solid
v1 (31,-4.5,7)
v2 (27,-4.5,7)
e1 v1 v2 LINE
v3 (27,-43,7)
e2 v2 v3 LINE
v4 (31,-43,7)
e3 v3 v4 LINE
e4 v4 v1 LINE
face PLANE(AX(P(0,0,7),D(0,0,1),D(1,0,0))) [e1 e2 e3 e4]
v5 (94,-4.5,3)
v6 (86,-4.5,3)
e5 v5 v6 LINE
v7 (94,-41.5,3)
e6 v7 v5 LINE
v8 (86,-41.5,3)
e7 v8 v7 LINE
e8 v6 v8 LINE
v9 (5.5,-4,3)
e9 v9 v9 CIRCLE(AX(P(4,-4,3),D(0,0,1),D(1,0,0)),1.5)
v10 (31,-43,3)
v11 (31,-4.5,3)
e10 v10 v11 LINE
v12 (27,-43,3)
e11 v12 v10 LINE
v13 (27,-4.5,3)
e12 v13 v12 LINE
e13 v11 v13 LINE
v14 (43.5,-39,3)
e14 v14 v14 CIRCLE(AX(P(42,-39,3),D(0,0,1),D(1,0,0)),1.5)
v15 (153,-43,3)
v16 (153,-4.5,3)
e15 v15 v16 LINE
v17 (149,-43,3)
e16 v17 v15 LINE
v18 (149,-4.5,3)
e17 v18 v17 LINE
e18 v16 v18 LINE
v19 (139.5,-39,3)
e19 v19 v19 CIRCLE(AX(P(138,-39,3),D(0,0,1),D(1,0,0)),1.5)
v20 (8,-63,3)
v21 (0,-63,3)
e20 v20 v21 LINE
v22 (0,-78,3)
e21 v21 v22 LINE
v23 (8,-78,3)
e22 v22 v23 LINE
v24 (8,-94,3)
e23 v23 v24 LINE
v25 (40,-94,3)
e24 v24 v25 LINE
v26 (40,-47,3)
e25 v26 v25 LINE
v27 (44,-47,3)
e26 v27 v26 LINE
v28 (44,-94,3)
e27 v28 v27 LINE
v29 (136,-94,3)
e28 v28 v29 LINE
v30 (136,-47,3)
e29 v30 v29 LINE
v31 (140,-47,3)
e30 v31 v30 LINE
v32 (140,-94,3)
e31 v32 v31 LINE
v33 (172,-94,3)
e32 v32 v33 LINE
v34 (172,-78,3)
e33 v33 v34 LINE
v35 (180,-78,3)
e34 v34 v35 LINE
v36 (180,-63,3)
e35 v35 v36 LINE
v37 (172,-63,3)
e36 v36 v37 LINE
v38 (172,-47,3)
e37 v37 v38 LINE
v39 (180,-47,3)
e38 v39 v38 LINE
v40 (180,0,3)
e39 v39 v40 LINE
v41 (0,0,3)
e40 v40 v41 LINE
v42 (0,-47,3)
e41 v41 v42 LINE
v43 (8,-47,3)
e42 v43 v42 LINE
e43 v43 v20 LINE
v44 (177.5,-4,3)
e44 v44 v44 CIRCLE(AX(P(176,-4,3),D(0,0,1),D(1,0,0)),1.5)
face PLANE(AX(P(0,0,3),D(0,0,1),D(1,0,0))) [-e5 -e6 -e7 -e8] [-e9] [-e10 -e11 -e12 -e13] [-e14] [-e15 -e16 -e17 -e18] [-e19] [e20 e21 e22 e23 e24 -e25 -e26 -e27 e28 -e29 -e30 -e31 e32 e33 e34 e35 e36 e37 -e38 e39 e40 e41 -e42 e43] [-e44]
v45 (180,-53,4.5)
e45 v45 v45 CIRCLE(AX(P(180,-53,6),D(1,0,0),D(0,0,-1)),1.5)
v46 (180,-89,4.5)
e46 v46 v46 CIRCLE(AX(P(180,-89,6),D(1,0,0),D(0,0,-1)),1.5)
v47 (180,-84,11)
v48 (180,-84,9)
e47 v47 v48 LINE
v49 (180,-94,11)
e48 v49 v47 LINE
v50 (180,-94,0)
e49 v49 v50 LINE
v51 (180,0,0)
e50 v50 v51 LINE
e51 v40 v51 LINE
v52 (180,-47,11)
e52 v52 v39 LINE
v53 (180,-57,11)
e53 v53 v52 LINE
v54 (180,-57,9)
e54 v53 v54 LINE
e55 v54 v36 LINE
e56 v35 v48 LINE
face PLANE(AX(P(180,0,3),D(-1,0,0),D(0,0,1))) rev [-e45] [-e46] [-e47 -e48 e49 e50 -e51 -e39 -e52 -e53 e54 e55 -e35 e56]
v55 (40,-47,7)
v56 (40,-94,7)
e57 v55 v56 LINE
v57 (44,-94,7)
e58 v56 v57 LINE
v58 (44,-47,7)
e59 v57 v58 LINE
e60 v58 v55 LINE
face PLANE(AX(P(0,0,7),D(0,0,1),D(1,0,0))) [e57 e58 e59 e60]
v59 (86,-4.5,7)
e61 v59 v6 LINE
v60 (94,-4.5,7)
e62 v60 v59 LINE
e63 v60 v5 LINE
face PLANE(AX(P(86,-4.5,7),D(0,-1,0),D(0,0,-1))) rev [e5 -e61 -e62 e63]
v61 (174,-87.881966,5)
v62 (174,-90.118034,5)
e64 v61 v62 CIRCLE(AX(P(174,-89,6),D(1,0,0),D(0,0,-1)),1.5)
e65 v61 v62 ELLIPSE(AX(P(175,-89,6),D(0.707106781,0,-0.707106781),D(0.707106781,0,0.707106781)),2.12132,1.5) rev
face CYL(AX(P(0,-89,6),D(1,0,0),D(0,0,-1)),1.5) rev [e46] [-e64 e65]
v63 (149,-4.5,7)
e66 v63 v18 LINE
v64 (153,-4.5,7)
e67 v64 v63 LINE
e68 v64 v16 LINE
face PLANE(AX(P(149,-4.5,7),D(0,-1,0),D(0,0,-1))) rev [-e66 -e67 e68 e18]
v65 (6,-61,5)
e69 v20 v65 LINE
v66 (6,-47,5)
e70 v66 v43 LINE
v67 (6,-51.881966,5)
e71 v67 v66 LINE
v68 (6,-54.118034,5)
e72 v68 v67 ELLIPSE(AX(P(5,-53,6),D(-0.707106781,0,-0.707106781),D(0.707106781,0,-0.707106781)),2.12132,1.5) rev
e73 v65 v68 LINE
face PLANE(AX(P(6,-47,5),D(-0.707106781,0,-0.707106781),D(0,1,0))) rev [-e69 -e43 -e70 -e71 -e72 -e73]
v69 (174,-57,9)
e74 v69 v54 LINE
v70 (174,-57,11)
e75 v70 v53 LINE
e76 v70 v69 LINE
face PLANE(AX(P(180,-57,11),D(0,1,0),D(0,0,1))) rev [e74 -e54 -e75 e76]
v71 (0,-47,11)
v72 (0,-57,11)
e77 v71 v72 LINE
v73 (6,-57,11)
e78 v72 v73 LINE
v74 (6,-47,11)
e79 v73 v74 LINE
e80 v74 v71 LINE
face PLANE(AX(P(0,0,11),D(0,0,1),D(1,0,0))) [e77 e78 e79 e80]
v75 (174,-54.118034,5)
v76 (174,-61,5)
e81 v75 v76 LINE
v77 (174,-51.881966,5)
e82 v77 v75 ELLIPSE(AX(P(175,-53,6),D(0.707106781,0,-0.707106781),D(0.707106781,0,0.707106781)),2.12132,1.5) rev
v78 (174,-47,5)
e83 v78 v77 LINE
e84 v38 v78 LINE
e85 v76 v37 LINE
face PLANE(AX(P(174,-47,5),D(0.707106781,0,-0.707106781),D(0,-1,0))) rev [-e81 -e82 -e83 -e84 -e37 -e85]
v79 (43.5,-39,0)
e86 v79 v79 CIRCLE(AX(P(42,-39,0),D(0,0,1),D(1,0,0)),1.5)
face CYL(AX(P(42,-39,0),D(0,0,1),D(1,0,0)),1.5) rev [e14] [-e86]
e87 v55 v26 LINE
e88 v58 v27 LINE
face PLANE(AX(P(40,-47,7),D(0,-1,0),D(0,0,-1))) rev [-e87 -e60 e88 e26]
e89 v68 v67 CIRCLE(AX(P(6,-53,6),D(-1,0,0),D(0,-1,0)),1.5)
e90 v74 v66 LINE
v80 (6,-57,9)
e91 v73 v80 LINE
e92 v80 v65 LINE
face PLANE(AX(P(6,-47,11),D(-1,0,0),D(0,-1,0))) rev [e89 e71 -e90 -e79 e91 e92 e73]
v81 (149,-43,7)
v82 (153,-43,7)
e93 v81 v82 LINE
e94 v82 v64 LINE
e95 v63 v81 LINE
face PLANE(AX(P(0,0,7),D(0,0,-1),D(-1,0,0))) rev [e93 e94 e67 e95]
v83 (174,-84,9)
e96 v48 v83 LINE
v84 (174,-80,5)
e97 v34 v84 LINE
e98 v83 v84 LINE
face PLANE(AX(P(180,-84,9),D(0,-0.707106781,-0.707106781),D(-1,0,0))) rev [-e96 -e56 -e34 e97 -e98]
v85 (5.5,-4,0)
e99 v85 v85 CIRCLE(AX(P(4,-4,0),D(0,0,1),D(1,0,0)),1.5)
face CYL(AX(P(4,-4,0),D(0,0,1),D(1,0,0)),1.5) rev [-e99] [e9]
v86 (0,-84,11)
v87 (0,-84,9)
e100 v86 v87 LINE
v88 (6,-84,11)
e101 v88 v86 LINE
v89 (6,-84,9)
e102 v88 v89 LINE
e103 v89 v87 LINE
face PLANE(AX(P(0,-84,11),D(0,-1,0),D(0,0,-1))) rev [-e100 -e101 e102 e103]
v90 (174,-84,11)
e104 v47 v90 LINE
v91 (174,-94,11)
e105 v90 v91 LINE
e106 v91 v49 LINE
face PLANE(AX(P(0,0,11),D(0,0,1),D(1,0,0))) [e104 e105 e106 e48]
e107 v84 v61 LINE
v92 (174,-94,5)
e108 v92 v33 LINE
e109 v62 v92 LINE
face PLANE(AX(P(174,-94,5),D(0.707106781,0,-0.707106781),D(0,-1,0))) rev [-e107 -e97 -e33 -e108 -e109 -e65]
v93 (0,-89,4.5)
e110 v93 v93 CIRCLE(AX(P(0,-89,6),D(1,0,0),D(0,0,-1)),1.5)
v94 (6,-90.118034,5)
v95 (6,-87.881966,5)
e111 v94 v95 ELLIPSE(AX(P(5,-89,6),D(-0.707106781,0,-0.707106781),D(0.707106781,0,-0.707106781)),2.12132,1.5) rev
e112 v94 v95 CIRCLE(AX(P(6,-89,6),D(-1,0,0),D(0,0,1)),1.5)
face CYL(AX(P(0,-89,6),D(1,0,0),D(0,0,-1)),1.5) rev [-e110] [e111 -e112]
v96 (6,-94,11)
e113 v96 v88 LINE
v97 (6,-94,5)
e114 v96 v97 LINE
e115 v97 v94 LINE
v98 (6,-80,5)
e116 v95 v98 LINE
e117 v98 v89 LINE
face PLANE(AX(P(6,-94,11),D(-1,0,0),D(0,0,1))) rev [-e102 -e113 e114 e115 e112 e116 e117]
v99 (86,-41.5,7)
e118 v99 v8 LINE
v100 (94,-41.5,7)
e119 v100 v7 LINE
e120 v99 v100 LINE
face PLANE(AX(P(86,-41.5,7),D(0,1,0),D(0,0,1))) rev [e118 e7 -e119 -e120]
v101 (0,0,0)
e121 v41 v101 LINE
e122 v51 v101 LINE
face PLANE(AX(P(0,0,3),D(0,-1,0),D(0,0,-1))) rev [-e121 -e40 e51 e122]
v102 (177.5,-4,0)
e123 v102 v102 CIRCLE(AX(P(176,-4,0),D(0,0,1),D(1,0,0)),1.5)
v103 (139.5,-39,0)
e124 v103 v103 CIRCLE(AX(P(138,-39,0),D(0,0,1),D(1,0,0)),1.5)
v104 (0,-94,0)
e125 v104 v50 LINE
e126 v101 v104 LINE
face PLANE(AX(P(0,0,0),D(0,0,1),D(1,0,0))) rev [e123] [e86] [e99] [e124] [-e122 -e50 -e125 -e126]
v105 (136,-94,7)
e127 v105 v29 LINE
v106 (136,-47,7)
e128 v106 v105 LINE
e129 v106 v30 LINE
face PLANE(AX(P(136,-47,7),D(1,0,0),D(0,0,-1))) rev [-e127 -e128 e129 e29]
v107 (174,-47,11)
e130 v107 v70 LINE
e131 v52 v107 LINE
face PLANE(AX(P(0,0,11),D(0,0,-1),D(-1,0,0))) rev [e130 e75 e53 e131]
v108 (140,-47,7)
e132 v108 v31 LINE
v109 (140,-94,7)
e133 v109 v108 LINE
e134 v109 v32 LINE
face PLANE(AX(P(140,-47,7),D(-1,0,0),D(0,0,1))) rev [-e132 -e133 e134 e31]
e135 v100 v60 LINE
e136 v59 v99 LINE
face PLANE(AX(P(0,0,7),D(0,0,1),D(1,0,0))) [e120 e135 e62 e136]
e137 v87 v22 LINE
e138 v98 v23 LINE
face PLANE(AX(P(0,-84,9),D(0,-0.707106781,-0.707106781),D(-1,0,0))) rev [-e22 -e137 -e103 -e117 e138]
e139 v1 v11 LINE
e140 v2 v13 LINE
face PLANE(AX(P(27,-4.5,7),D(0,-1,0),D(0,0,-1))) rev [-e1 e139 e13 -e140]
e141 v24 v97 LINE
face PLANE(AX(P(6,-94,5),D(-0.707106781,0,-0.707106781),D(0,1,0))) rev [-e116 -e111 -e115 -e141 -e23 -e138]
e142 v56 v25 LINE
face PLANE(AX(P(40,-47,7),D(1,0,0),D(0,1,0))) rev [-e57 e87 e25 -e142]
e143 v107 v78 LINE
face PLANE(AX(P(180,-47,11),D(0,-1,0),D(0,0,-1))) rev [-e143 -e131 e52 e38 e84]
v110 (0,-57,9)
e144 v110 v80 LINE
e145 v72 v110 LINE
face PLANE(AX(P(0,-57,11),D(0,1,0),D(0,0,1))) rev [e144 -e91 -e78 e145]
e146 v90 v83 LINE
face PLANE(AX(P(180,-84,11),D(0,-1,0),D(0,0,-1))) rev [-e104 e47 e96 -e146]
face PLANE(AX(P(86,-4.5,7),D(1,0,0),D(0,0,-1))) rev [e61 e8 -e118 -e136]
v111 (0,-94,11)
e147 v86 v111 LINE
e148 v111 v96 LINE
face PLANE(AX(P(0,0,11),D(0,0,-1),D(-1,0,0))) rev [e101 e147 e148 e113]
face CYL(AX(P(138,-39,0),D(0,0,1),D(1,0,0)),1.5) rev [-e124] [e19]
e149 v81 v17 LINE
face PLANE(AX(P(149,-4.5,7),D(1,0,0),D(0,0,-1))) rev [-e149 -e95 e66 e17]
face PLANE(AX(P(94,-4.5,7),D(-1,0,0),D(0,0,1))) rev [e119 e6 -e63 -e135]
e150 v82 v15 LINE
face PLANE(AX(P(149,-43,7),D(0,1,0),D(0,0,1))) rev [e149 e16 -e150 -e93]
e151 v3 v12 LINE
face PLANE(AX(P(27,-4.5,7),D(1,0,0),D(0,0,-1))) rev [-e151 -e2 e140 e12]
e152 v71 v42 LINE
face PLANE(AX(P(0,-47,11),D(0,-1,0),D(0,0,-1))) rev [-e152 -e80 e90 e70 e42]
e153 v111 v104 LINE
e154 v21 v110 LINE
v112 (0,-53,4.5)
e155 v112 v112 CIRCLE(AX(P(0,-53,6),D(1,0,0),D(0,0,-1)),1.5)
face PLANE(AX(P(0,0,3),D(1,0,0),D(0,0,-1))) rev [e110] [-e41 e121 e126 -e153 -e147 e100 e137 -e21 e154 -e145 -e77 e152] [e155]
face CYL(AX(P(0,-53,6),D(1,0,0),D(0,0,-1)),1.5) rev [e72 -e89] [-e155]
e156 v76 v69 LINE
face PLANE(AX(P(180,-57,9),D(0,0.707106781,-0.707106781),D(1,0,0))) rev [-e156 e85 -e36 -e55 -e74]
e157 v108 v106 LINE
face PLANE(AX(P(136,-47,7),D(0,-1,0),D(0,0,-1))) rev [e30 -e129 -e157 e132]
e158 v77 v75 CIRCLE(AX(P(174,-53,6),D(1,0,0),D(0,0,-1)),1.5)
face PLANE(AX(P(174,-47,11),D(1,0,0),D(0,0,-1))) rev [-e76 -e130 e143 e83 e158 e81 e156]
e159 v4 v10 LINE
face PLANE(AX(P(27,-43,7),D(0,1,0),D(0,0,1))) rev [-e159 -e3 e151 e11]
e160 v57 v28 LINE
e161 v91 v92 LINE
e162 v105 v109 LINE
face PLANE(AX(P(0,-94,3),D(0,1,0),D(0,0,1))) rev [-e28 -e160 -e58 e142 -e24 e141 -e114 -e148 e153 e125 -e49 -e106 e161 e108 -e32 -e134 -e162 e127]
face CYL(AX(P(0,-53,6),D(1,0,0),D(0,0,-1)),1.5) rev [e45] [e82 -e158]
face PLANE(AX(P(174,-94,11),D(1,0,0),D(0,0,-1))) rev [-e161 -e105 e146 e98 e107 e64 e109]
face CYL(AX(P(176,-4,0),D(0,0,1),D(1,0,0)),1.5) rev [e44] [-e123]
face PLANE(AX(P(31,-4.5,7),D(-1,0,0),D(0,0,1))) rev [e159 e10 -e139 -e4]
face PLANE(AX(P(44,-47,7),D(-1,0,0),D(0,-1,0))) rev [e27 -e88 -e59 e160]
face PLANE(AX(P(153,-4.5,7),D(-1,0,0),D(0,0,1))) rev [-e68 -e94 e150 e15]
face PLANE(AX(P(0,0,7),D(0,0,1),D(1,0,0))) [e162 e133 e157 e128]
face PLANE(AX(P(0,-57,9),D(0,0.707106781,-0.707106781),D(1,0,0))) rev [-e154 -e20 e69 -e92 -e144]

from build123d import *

# Parameters (mm, degrees)
SKETCH_1_W          = 180
SKETCH_1_H          = 94
EXTRUDE_1_DEPTH     = 3
SKETCH_2_W          = 6
SKETCH_2_H          = 10
EXTRUDE_2_DEPTH     = 8
CHAMFER_2_SIZE      = 6
CHAMFER_1_SIZE      = 6
SKETCH_3_R          = 1.5
CUT_EXTRUDE_1_DEPTH = 204.364205307
SKETCH_4_R          = 1.5
CUT_EXTRUDE_2_DEPTH = 204.224014329
SKETCH_5_W          = 4
SKETCH_5_H          = 47
SKETCH_5_H_2        = 38.5
SKETCH_5_W_2        = 8
SKETCH_5_H_3        = 37
EXTRUDE_3_DEPTH     = 4
CHAMFER_3_SIZE      = 2


with BuildPart() as part:
    # Эскиз1 → Бобышка-Вытянуть1 (new body)
    with BuildSketch(Plane.XY):
        with Locations((90, -47)):
            Rectangle(SKETCH_1_W, SKETCH_1_H)
    extrude(amount=EXTRUDE_1_DEPTH)

    # Эскиз2 → Бобышка-Вытянуть2 (add)
    with BuildSketch(Plane.XY.offset(3)):
        with Locations((3, -89)):
            Rectangle(SKETCH_2_W, SKETCH_2_H)
        with Locations((177, -89)):
            Rectangle(SKETCH_2_W, SKETCH_2_H)
        with Locations((3, -52)):
            Rectangle(SKETCH_2_W, SKETCH_2_H)
        with Locations((177, -52)):
            Rectangle(SKETCH_2_W, SKETCH_2_H)
    extrude(amount=EXTRUDE_2_DEPTH)

    # Фаска2
    chamfer_2_edges = [part.edges().sort_by_distance(p)[0] for p in [
        (3, -57, 3),
        (177, -57, 3),
    ]]
    chamfer(chamfer_2_edges, length=CHAMFER_2_SIZE)

    # Фаска1
    chamfer_1_edges = [part.edges().sort_by_distance(p)[0] for p in [
        (3, -84, 3),
        (177, -84, 3),
    ]]
    chamfer(chamfer_1_edges, length=CHAMFER_1_SIZE)

    # Эскиз3 → Вырез-Вытянуть1 (cut, through all)
    with BuildSketch(Plane(origin=(180, 0, 0), x_dir=(0, 0, -1), z_dir=(1, 0, 0))):
        with Locations((-6, -89)):
            Circle(SKETCH_3_R)
        with Locations((-6, -53)):
            Circle(SKETCH_3_R)
    extrude(amount=-CUT_EXTRUDE_1_DEPTH, mode=Mode.SUBTRACT)

    # Эскиз4 → Вырез-Вытянуть2 (cut, through all)
    with BuildSketch(Plane.XY.offset(3)):
        with Locations((4, -4)):
            Circle(SKETCH_4_R)
        with Locations((176, -4)):
            Circle(SKETCH_4_R)
        with Locations((42, -39)):
            Circle(SKETCH_4_R)
        with Locations((138, -39)):
            Circle(SKETCH_4_R)
    extrude(amount=-CUT_EXTRUDE_2_DEPTH, mode=Mode.SUBTRACT)

    # Эскиз5 → Бобышка-Вытянуть3 (add)
    with BuildSketch(Plane.XY.offset(3)):
        with Locations((42, -70.5)):
            Rectangle(SKETCH_5_W, SKETCH_5_H)
        with Locations((138, -70.5)):
            Rectangle(SKETCH_5_W, SKETCH_5_H)
        with Locations((29, -23.75)):
            Rectangle(SKETCH_5_W, SKETCH_5_H_2)
        with Locations((151, -23.75)):
            Rectangle(SKETCH_5_W, SKETCH_5_H_2)
        with Locations((90, -23)):
            Rectangle(SKETCH_5_W_2, SKETCH_5_H_3)
    extrude(amount=EXTRUDE_3_DEPTH)

    # Фаска3
    # the kernel refuses this chamfer: 2 mm, written as the material it adds along each edge
    with BuildSketch(Plane(origin=(6, -72.856634024, 3), x_dir=(0.9996219169112968, 0, -0.02749587661058627), z_dir=(0, -1, 0))) as chamfer_3_piece_1_section:
        Polygon((CHAMFER_3_SIZE * 0.999621916911, CHAMFER_3_SIZE * 0.0274958766106), (-CHAMFER_3_SIZE * 0.0274958766106, CHAMFER_3_SIZE * 0.999621916911), (0, 0), align=None)
    chamfer_3_piece_1 = extrude(amount=21.143365976, mode=Mode.PRIVATE)
    chamfer_3_piece_1 = split(chamfer_3_piece_1, bisect_by=Plane(origin=(6.672348165, -82.469530213, 7.469530213), z_dir=(0, -0.7071067811865476, -0.7071067811865476)), keep=Keep.TOP, mode=Mode.PRIVATE)
    chamfer_3_piece_1 = chamfer_3_piece_1 - Plane(origin=(6.672348165, -89, 6), x_dir=(0, 0, -1), z_dir=(1, 0, 0)) * Cylinder(1.5, 51, mode=Mode.PRIVATE)
    add(chamfer_3_piece_1)
    with BuildSketch(Plane(origin=(174, -94, 3), x_dir=(-0.9996219169112968, 0, -0.02749587661058639), z_dir=(0, 1, 0))) as chamfer_3_piece_2_section:
        Polygon((CHAMFER_3_SIZE * 0.999621916911, CHAMFER_3_SIZE * 0.0274958766106), (-CHAMFER_3_SIZE * 0.0274958766106, CHAMFER_3_SIZE * 0.999621916911), (0, 0), align=None)
    chamfer_3_piece_2 = extrude(amount=21.143365976, mode=Mode.PRIVATE)
    chamfer_3_piece_2 = split(chamfer_3_piece_2, bisect_by=Plane(origin=(173.327651835, -82.469530213, 7.469530213), z_dir=(0, -0.7071067811865476, -0.7071067811865476)), keep=Keep.TOP, mode=Mode.PRIVATE)
    chamfer_3_piece_2 = chamfer_3_piece_2 - Plane(origin=(173.327651835, -89, 6), x_dir=(0, 0, -1), z_dir=(1, 0, 0)) * Cylinder(1.5, 51, mode=Mode.PRIVATE)
    add(chamfer_3_piece_2)
    with BuildSketch(Plane(origin=(6, -47, 3), x_dir=(0.9996219169112968, 0, -0.02749587661058627), z_dir=(0, -1, 0))) as chamfer_3_piece_3_section:
        Polygon((CHAMFER_3_SIZE * 0.999621916911, CHAMFER_3_SIZE * 0.0274958766106), (-CHAMFER_3_SIZE * 0.0274958766106, CHAMFER_3_SIZE * 0.999621916911), (0, 0), align=None)
    chamfer_3_piece_3 = extrude(amount=21.143365976, mode=Mode.PRIVATE)
    chamfer_3_piece_3 = split(chamfer_3_piece_3, bisect_by=Plane(origin=(6.672348166, -58.527104034, 7.472895966), z_dir=(0, 0.7071067811865476, -0.7071067811865476)), keep=Keep.TOP, mode=Mode.PRIVATE)
    chamfer_3_piece_3 = chamfer_3_piece_3 - Plane(origin=(6.672348166, -53, 6), x_dir=(0, 0, -1), z_dir=(1, 0, 0)) * Cylinder(1.5, 51, mode=Mode.PRIVATE)
    add(chamfer_3_piece_3)
    with BuildSketch(Plane(origin=(174, -68.143365976, 3), x_dir=(-0.9996219169112968, 0, -0.02749587661058639), z_dir=(0, 1, 0))) as chamfer_3_piece_4_section:
        Polygon((CHAMFER_3_SIZE * 0.999621916911, CHAMFER_3_SIZE * 0.0274958766106), (-CHAMFER_3_SIZE * 0.0274958766106, CHAMFER_3_SIZE * 0.999621916911), (0, 0), align=None)
    chamfer_3_piece_4 = extrude(amount=21.143365976, mode=Mode.PRIVATE)
    chamfer_3_piece_4 = split(chamfer_3_piece_4, bisect_by=Plane(origin=(173.327651834, -58.527104034, 7.472895966), z_dir=(0, 0.7071067811865476, -0.7071067811865476)), keep=Keep.TOP, mode=Mode.PRIVATE)
    chamfer_3_piece_4 = chamfer_3_piece_4 - Plane(origin=(173.327651834, -53, 6), x_dir=(0, 0, -1), z_dir=(1, 0, 0)) * Cylinder(1.5, 51, mode=Mode.PRIVATE)
    add(chamfer_3_piece_4)


solid = part.part
